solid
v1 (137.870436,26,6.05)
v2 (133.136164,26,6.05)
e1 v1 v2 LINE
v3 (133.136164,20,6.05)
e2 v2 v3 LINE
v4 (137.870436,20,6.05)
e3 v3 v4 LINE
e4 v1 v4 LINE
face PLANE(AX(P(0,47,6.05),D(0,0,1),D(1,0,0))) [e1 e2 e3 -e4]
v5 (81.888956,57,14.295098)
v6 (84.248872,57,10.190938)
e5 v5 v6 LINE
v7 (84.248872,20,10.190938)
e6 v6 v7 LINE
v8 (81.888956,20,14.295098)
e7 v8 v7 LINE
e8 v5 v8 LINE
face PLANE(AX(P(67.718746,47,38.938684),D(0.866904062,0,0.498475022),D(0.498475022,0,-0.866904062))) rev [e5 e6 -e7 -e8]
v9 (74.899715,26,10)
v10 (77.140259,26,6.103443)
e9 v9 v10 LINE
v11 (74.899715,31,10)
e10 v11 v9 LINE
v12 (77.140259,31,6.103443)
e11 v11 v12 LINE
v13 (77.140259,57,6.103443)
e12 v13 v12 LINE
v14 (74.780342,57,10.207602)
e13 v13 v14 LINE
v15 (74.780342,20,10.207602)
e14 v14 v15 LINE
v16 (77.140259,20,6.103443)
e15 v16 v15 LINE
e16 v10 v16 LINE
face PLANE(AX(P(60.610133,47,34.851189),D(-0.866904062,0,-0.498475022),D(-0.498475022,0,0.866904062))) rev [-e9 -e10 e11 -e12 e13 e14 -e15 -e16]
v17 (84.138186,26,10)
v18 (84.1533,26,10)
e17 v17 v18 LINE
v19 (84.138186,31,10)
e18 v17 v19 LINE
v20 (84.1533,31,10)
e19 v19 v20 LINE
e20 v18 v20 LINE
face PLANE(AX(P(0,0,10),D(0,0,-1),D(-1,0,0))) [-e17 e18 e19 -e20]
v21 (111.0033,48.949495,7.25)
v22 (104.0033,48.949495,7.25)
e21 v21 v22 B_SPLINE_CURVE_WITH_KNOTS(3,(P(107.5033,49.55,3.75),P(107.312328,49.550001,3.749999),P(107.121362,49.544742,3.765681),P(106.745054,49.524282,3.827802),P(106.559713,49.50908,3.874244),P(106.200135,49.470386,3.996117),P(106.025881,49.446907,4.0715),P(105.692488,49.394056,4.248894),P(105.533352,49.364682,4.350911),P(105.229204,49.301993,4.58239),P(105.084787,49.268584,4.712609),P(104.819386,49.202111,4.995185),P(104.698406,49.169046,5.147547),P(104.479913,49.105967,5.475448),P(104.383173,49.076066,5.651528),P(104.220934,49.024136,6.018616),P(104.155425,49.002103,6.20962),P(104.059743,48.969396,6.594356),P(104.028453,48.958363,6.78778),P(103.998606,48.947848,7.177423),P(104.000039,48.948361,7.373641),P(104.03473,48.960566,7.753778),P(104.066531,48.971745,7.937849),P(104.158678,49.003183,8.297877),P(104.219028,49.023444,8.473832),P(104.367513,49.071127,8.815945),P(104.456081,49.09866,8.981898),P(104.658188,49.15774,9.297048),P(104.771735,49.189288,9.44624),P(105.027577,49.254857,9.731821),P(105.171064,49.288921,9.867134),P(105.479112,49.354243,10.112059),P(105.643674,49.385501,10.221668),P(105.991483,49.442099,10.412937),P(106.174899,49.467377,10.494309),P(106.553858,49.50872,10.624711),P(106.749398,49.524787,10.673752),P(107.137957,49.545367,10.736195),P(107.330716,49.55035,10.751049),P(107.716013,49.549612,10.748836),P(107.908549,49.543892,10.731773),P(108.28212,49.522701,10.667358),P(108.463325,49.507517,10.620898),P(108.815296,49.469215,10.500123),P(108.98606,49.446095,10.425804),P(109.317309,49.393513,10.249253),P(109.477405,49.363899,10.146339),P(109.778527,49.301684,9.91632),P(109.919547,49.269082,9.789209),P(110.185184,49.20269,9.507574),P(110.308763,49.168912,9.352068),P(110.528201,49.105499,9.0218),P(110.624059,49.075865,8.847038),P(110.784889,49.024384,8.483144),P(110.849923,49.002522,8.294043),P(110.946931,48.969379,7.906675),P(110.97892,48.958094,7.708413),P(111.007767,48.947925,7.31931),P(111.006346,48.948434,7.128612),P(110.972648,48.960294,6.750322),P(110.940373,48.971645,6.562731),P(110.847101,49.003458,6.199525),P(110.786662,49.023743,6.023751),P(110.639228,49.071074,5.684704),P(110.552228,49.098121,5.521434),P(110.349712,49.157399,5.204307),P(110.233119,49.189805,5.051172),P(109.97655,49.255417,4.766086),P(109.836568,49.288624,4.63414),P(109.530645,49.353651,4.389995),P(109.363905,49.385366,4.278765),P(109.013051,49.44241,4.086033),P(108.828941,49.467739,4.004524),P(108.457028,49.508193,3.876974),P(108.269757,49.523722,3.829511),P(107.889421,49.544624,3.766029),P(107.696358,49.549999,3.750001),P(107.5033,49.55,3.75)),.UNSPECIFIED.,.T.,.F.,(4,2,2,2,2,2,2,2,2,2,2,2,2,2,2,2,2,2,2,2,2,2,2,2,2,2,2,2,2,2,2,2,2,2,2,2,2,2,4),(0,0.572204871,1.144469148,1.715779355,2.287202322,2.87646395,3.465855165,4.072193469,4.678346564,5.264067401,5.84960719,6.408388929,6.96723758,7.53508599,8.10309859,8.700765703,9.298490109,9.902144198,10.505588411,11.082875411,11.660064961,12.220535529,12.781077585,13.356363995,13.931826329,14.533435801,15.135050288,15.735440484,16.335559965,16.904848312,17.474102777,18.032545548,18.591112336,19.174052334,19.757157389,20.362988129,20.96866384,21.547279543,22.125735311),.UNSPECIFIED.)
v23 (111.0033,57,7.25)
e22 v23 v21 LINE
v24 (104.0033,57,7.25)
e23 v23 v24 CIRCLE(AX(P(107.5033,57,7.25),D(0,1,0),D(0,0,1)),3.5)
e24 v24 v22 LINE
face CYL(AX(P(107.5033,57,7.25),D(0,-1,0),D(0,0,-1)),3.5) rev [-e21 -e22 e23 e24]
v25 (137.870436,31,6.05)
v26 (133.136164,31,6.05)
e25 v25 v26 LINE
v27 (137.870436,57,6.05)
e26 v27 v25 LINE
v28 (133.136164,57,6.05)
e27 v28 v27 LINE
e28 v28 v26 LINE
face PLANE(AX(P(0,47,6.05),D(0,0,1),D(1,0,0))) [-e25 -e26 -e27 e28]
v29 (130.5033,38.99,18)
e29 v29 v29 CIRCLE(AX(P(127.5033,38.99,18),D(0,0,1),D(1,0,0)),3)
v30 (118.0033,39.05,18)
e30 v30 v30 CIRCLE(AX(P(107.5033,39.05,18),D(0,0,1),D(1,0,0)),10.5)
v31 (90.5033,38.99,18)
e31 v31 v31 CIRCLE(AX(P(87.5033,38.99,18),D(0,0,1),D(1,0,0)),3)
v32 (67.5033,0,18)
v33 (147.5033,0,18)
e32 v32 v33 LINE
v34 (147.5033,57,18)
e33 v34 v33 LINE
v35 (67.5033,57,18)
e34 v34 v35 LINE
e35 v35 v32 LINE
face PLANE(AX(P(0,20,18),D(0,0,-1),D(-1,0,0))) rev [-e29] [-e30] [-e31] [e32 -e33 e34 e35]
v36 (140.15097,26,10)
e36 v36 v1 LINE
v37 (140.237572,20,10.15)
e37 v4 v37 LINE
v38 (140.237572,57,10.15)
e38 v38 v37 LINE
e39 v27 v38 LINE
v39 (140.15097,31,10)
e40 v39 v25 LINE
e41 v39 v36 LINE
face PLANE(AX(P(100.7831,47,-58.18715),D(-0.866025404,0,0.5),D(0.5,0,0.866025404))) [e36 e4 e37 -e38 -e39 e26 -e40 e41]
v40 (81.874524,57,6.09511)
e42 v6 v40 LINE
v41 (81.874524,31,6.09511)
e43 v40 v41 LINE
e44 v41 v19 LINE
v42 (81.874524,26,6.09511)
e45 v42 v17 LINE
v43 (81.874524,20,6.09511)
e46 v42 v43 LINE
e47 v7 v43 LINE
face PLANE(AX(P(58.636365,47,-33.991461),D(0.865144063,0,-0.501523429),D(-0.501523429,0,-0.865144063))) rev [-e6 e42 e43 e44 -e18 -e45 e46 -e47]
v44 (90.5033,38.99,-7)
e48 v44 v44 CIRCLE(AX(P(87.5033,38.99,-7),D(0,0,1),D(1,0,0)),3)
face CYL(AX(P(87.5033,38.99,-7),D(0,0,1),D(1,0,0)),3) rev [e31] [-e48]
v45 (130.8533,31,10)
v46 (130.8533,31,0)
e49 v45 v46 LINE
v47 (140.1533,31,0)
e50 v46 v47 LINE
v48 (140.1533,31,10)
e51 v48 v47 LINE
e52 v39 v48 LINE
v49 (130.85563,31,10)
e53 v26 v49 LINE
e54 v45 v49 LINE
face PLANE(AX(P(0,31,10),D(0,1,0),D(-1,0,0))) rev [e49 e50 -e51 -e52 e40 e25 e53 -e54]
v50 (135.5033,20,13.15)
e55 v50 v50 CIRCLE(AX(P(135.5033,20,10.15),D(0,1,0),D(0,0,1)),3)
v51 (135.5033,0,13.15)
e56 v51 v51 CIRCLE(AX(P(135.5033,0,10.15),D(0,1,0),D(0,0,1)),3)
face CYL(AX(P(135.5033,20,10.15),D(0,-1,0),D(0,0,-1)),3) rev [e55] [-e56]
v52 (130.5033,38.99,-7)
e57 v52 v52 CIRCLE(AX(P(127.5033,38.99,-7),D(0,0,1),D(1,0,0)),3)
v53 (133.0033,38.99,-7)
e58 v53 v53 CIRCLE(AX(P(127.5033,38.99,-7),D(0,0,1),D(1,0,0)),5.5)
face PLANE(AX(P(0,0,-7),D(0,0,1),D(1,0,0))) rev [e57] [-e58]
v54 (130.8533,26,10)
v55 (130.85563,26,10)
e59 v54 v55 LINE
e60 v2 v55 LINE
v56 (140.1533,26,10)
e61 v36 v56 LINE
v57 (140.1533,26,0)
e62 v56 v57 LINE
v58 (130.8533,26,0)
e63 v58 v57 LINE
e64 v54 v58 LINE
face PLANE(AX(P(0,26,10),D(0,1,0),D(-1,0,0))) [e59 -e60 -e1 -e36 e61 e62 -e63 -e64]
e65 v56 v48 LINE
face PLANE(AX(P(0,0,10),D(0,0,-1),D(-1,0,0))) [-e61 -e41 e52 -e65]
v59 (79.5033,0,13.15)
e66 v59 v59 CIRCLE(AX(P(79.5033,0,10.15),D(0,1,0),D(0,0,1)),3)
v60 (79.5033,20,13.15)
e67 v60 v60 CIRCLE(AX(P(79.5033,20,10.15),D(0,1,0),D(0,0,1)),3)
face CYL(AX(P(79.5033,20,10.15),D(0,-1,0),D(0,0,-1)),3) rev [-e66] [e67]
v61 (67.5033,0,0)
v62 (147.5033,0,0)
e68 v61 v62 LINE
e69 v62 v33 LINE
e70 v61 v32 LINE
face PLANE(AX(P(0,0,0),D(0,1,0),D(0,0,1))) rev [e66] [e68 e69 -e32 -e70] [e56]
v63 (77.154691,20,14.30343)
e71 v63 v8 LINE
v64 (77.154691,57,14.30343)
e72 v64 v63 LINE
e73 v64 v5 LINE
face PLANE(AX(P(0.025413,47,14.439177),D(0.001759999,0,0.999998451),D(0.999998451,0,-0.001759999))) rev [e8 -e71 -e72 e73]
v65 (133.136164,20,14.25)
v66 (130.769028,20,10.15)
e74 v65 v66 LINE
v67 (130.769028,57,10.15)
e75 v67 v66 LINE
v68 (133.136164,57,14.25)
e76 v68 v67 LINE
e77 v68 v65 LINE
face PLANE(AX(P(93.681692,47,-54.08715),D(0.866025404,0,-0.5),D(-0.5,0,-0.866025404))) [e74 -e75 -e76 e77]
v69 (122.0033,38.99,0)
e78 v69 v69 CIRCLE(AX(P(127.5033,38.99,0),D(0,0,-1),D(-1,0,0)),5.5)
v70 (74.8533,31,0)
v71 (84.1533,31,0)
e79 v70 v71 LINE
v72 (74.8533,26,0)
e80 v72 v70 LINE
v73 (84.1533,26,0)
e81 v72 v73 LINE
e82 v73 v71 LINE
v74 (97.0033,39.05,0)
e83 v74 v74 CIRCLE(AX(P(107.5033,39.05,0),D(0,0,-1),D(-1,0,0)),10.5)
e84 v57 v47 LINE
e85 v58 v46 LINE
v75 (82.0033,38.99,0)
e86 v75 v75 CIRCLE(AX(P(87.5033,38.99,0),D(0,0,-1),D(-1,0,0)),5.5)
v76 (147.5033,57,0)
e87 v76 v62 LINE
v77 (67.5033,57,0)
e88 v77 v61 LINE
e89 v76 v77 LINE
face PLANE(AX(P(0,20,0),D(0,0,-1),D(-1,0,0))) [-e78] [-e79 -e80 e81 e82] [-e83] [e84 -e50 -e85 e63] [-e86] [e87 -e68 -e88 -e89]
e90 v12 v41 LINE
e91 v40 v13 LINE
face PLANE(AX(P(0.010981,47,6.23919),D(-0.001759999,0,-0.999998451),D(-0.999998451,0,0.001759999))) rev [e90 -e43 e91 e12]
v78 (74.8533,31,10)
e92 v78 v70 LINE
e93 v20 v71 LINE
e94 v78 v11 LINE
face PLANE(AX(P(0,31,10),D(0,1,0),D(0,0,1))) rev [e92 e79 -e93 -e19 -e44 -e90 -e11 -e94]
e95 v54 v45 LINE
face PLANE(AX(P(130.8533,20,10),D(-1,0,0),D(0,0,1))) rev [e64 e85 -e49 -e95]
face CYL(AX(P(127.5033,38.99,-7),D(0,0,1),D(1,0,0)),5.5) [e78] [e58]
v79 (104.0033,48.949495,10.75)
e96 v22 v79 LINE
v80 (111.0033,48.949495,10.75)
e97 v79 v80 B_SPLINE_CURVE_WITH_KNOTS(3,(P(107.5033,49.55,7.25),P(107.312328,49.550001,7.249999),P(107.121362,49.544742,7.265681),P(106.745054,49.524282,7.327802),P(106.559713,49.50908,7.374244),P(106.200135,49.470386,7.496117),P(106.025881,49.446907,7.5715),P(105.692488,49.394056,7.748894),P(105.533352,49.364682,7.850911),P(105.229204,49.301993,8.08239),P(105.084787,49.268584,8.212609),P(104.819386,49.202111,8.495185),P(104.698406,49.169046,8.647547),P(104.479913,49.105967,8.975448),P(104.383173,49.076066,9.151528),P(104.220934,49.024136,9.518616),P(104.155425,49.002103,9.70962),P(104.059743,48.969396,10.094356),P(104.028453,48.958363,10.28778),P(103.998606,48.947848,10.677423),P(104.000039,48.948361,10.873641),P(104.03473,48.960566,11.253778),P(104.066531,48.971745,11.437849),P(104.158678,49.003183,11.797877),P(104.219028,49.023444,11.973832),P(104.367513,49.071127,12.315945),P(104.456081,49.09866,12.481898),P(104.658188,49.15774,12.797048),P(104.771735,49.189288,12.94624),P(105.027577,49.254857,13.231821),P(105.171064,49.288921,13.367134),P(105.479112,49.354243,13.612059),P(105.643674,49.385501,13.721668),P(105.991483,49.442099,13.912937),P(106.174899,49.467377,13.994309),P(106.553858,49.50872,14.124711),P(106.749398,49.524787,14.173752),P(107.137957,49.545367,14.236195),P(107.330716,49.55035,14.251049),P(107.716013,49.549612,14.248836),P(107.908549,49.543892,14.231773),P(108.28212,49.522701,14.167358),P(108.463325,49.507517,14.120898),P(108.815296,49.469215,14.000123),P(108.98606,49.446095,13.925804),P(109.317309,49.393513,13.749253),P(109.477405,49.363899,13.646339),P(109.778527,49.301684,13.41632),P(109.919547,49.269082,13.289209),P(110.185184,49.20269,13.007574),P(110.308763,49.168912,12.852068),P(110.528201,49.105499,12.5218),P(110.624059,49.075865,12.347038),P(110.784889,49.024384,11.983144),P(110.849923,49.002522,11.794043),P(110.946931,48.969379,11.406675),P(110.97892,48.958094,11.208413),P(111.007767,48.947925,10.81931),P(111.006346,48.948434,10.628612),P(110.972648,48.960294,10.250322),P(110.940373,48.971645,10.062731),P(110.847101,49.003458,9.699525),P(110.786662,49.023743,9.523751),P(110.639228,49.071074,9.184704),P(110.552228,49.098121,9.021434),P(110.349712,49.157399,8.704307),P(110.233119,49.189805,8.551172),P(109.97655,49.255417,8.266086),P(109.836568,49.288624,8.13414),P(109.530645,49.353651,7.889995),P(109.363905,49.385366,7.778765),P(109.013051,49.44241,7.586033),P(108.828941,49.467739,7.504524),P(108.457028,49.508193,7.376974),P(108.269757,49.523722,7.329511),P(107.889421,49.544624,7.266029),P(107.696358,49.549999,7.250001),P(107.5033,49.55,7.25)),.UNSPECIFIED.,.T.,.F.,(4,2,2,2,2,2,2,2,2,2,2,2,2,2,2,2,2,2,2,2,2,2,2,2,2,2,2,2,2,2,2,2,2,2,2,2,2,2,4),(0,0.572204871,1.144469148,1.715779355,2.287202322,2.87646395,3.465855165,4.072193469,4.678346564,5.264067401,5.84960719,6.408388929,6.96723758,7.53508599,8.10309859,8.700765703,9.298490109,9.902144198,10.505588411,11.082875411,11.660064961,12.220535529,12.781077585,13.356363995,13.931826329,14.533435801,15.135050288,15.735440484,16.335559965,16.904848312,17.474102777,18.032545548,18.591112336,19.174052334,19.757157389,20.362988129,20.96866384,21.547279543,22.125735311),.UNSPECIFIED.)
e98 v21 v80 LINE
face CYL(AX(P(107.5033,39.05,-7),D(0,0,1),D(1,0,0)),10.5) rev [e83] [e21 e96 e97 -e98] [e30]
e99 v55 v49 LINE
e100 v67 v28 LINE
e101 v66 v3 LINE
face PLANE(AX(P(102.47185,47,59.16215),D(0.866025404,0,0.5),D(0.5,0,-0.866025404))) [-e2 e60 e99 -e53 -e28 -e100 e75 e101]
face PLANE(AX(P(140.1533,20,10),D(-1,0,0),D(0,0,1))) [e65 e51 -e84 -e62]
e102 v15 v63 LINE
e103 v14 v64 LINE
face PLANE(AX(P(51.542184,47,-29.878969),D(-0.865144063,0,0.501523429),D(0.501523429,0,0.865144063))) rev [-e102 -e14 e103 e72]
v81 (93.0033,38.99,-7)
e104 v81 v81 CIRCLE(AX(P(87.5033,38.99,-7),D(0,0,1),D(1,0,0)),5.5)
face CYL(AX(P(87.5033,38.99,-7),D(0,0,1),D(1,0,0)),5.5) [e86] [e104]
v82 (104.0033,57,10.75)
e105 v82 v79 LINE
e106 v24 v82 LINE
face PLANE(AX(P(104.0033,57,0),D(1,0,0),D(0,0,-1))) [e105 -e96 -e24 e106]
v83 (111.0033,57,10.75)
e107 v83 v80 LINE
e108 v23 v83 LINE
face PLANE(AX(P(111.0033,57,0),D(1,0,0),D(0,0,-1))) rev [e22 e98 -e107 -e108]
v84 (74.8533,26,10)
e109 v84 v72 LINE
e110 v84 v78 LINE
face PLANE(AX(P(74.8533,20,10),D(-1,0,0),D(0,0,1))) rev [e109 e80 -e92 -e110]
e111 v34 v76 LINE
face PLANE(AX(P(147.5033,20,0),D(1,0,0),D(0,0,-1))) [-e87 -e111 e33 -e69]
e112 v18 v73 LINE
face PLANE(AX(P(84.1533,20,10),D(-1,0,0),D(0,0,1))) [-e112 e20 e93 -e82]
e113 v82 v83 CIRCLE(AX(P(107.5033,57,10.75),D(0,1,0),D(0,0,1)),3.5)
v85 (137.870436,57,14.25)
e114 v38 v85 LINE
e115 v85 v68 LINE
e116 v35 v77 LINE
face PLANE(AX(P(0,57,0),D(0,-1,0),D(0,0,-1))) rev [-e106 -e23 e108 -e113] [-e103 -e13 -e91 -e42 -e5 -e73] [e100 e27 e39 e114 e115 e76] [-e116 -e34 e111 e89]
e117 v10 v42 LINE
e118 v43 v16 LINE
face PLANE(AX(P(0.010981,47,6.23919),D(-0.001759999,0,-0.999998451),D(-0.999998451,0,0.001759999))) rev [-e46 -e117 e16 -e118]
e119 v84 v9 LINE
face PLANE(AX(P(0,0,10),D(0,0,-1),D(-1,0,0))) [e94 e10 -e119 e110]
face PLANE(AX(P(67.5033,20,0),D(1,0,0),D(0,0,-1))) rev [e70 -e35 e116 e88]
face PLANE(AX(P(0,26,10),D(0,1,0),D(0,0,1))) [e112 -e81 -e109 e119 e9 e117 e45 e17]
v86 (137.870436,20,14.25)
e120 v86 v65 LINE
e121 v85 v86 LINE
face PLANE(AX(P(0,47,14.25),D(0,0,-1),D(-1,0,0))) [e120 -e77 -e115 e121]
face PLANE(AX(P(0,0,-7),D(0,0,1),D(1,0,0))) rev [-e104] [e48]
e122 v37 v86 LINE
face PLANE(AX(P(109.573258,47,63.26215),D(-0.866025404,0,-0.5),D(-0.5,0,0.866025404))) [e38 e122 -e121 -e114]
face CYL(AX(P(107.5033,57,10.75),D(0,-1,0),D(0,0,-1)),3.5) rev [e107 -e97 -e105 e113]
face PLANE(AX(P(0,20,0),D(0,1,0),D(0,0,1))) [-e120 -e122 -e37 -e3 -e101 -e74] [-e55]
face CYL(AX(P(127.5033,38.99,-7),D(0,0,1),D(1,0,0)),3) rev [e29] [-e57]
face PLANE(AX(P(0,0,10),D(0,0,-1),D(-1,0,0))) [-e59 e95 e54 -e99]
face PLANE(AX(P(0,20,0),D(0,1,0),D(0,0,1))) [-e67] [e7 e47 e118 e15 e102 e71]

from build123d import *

# Parameters (mm, degrees)
SKETCH1_W           = 80
SKETCH1_H           = 18
SKETCH1_R           = 3
BOSS_EXTRUDE1_DEPTH = 20
SKETCH1_3_W         = 27.5
SKETCH1_3_H         = 18
SKETCH1_3_W_2       = 25
SKETCH1_3_R         = 3.5
BOSS_EXTRUDE2_DEPTH = 47
BOSS_EXTRUDE3_START = 47
SKETCH1_6_W         = 80
SKETCH1_6_H         = 18
BOSS_EXTRUDE3_DEPTH = 10
SKETCH2_R           = 5.5
SKETCH2_R_2         = 4.475
SKETCH2_R_3         = 3
BOSS_EXTRUDE4_DEPTH = 25
SKETCH2_6_R         = 10.5
SKETCH2_6_R_2       = 3
CUT_EXTRUDE5_DEPTH  = 161.097543738
SKETCH1_8_R         = 3
CUT_EXTRUDE6_DEPTH  = 57
CUT_EXTRUDE13_START = 27
SKETCH1_12_R        = 3
CUT_EXTRUDE13_DEPTH = 30
CUT_EXTRUDE14_START = -18
SKETCH2_7_W         = 9.3
SKETCH2_7_H         = 5
CUT_EXTRUDE14_DEPTH = 10


with BuildPart() as part:
    # Sketch1 → Boss-Extrude1 (new body)
    with BuildSketch(Plane(origin=(0, 0, 0), x_dir=(1, 0, 0), z_dir=(0, 1, 0))):
        with Locations((107.5033, -9)):
            Rectangle(SKETCH1_W, SKETCH1_H)
        with Locations(Location((135.5033, -10.15, 0), (0, 0, 270))):
            Circle(SKETCH1_R, mode=Mode.SUBTRACT)
        with Locations(Location((79.5033, -10.15, 0), (0, 0, 270))):
            Circle(SKETCH1_R, mode=Mode.SUBTRACT)
    extrude(amount=BOSS_EXTRUDE1_DEPTH)

    # Sketch1<3> → Boss-Extrude2 (add)
    # profile 1 of 11: a face of its own
    with BuildSketch(Plane(origin=(0, 0, 0), x_dir=(1, 0, 0), z_dir=(0, 1, 0))):
        with Locations((133.7533, -9)):
            Rectangle(SKETCH1_3_W, SKETCH1_3_H)
        Polygon((133.136163896, -6.05), (137.870436104, -6.05), (140.237572207, -10.15), (137.870436104, -14.25), (133.136163896, -14.25), (130.769027793, -10.15), align=None, mode=Mode.SUBTRACT)
    # profile 2 of 11: a face of its own
    with BuildSketch(Plane(origin=(0, 0, 0), x_dir=(1, 0, 0), z_dir=(0, 1, 0))):
        with Locations((81.2533, -9)):
            Rectangle(SKETCH1_3_W, SKETCH1_3_H)
        Polygon((81.88895579, -14.295097543), (77.154690915, -14.303429856), (74.780342483, -10.207602362), (77.140258926, -6.103442556), (81.874523801, -6.095110243), (84.248872233, -10.190937737), align=None, mode=Mode.SUBTRACT)
    # profile 3 of 11: a face of its own
    with BuildSketch(Plane(origin=(0, 0, 0), x_dir=(1, 0, 0), z_dir=(0, 1, 0))):
        with Locations((107.5033, -9)):
            Rectangle(SKETCH1_3_W_2, SKETCH1_3_H)
        with BuildLine():
            ThreePointArc((111.0033, -10.75), (107.5033, -14.25), (104.0033, -10.75))
            Line((104.0033, -10.75), (104.0033, -7.25))
            ThreePointArc((104.0033, -7.25), (107.5033, -3.75), (111.0033, -7.25))
            Line((111.0033, -7.25), (111.0033, -10.75))
        make_face(mode=Mode.SUBTRACT)
    # profile 4 of 11: a face of its own
    with BuildSketch(Plane(origin=(0, 0, 0), x_dir=(1, 0, 0), z_dir=(0, 1, 0))):
        with Locations((107.5033, -10.75)):
            Circle(SKETCH1_3_R)
    # profile 5 of 11: a face of its own
    with BuildSketch(Plane(origin=(0, 0, 0), x_dir=(1, 0, 0), z_dir=(0, 1, 0))):
        with Locations((107.5033, -7.25)):
            Circle(SKETCH1_3_R)
    # profile 6 of 11: a face of its own
    with BuildSketch(Plane(origin=(0, 0, 0), x_dir=(1, 0, 0), z_dir=(0, 1, 0))):
        with Locations((107.5033, -7.25)):
            Circle(SKETCH1_3_R)
    # profile 7 of 11: a face of its own
    with BuildSketch(Plane(origin=(0, 0, 0), x_dir=(1, 0, 0), z_dir=(0, 1, 0))):
        with Locations((107.5033, -10.75)):
            Circle(SKETCH1_3_R)
    # profile 8 of 11: a face of its own
    with BuildSketch(Plane(origin=(0, 0, 0), x_dir=(1, 0, 0), z_dir=(0, 1, 0))):
        with BuildLine():
            Line((104.0033, -7.25), (104.0033, -10.75))
            ThreePointArc((104.0033, -10.75), (104.122559608, -9.844133342), (104.472211087, -9))
            ThreePointArc((104.472211087, -9), (104.122559608, -8.155866658), (104.0033, -7.25))
        make_face()
    # profile 9 of 11: a face of its own
    with BuildSketch(Plane(origin=(0, 0, 0), x_dir=(1, 0, 0), z_dir=(0, 1, 0))):
        with BuildLine():
            ThreePointArc((110.534388913, -9), (110.884040392, -9.844133342), (111.0033, -10.75))
            Line((111.0033, -10.75), (111.0033, -7.25))
            ThreePointArc((111.0033, -7.25), (110.884040392, -8.155866658), (110.534388913, -9))
        make_face()
    # profile 10 of 11: a face of its own
    with BuildSketch(Plane(origin=(0, 0, 0), x_dir=(1, 0, 0), z_dir=(0, 1, 0))):
        with Locations((107.5033, -10.75)):
            Circle(SKETCH1_3_R)
    # profile 11 of 11: a face of its own
    with BuildSketch(Plane(origin=(0, 0, 0), x_dir=(1, 0, 0), z_dir=(0, 1, 0))):
        with Locations((107.5033, -7.25)):
            Circle(SKETCH1_3_R)
    extrude(amount=BOSS_EXTRUDE2_DEPTH)

    # Sketch1<6> → Boss-Extrude3 (add)
    with BuildSketch(Plane(origin=(0, 0, 0), x_dir=(1, 0, 0), z_dir=(0, 1, 0)).offset(BOSS_EXTRUDE3_START)):
        with Locations((107.5033, -9)):
            Rectangle(SKETCH1_6_W, SKETCH1_6_H)
        Polygon((133.136163896, -6.05), (137.870436104, -6.05), (140.237572207, -10.15), (137.870436104, -14.25), (133.136163896, -14.25), (130.769027793, -10.15), align=None, mode=Mode.SUBTRACT)
        with BuildLine():
            Line((104.0033, -10.75), (104.0033, -7.25))
            ThreePointArc((104.0033, -7.25), (107.5033, -3.75), (111.0033, -7.25))
            Line((111.0033, -7.25), (111.0033, -10.75))
            ThreePointArc((111.0033, -10.75), (107.5033, -14.25), (104.0033, -10.75))
        make_face(mode=Mode.SUBTRACT)
        Polygon((77.154690915, -14.303429856), (74.780342483, -10.207602362), (77.140258926, -6.103442556), (81.874523801, -6.095110243), (84.248872233, -10.190937737), (81.88895579, -14.295097543), align=None, mode=Mode.SUBTRACT)
    extrude(amount=BOSS_EXTRUDE3_DEPTH)

    # Sketch2 → Boss-Extrude4 (add)
    # profile 1 of 4: a face of its own
    with BuildSketch(Plane.XY.offset(18)):
        with Locations((87.5033, 38.99)):
            Circle(SKETCH2_R)
        with Locations((87.5033, 38.99)):
            Circle(SKETCH2_R_2, mode=Mode.SUBTRACT)
    # profile 2 of 4: a face of its own
    with BuildSketch(Plane.XY.offset(18)):
        with Locations((87.5033, 38.99)):
            Circle(SKETCH2_R_2)
        with Locations((87.5033, 38.99)):
            Circle(SKETCH2_R_3, mode=Mode.SUBTRACT)
    # profile 3 of 4: a face of its own
    with BuildSketch(Plane.XY.offset(18)):
        with Locations((127.5033, 38.99)):
            Circle(SKETCH2_R)
        with Locations((127.5033, 38.99)):
            Circle(SKETCH2_R_2, mode=Mode.SUBTRACT)
    # profile 4 of 4: a face of its own
    with BuildSketch(Plane.XY.offset(18)):
        with Locations((127.5033, 38.99)):
            Circle(SKETCH2_R_2)
        with Locations((127.5033, 38.99)):
            Circle(SKETCH2_R_3, mode=Mode.SUBTRACT)
    extrude(amount=-BOSS_EXTRUDE4_DEPTH)

    # Sketch2<6> → Cut-Extrude5 (cut, through all)
    with BuildSketch(Plane.XY.offset(18)):
        with Locations((107.5033, 39.05)):
            Circle(SKETCH2_6_R)
        with Locations((87.5033, 38.99)):
            Circle(SKETCH2_6_R_2)
        with Locations((127.5033, 38.99)):
            Circle(SKETCH2_6_R_2)
    extrude(amount=-CUT_EXTRUDE5_DEPTH, mode=Mode.SUBTRACT)

    # Sketch1<8> → Cut-Extrude6 (cut)
    with BuildSketch(Plane(origin=(0, 0, 0), x_dir=(1, 0, 0), z_dir=(0, 1, 0))):
        with Locations(Location((135.5033, -10.15, 0), (0, 0, 270))):
            Circle(SKETCH1_8_R)
        with Locations(Location((79.5033, -10.15, 0), (0, 0, 270))):
            Circle(SKETCH1_8_R)
    extrude(amount=CUT_EXTRUDE6_DEPTH, mode=Mode.SUBTRACT)

    # Sketch1<12> → Cut-Extrude13 (cut)
    # profile 1 of 2: a face of its own
    with BuildSketch(Plane(origin=(0, 0, 0), x_dir=(1, 0, 0), z_dir=(0, 1, 0)).offset(CUT_EXTRUDE13_START)):
        Polygon((137.870436104, -14.25), (140.237572207, -10.15), (137.870436104, -6.05), (133.136163896, -6.05), (130.769027793, -10.15), (133.136163896, -14.25), align=None)
        with Locations(Location((135.5033, -10.15, 0), (0, 0, 270))):
            Circle(SKETCH1_12_R, mode=Mode.SUBTRACT)
    # profile 2 of 2: a face of its own
    with BuildSketch(Plane(origin=(0, 0, 0), x_dir=(1, 0, 0), z_dir=(0, 1, 0)).offset(CUT_EXTRUDE13_START)):
        Polygon((77.140258926, -6.103442556), (81.874523801, -6.095110243), (84.248872233, -10.190937737), (81.88895579, -14.295097543), (77.154690915, -14.303429856), (74.780342483, -10.207602362), align=None)
        with Locations(Location((79.5033, -10.15, 0), (0, 0, 270))):
            Circle(SKETCH1_12_R, mode=Mode.SUBTRACT)
    extrude(amount=CUT_EXTRUDE13_DEPTH, mode=Mode.SUBTRACT)

    # Sketch2<7> → Cut-Extrude14 (cut)
    with BuildSketch(Plane.XY.offset(18).offset(CUT_EXTRUDE14_START)):
        with Locations((79.5033, 28.5)):
            Rectangle(SKETCH2_7_W, SKETCH2_7_H)
        with Locations((135.5033, 28.5)):
            Rectangle(SKETCH2_7_W, SKETCH2_7_H)
    extrude(amount=CUT_EXTRUDE14_DEPTH, mode=Mode.SUBTRACT)


solid = part.part
